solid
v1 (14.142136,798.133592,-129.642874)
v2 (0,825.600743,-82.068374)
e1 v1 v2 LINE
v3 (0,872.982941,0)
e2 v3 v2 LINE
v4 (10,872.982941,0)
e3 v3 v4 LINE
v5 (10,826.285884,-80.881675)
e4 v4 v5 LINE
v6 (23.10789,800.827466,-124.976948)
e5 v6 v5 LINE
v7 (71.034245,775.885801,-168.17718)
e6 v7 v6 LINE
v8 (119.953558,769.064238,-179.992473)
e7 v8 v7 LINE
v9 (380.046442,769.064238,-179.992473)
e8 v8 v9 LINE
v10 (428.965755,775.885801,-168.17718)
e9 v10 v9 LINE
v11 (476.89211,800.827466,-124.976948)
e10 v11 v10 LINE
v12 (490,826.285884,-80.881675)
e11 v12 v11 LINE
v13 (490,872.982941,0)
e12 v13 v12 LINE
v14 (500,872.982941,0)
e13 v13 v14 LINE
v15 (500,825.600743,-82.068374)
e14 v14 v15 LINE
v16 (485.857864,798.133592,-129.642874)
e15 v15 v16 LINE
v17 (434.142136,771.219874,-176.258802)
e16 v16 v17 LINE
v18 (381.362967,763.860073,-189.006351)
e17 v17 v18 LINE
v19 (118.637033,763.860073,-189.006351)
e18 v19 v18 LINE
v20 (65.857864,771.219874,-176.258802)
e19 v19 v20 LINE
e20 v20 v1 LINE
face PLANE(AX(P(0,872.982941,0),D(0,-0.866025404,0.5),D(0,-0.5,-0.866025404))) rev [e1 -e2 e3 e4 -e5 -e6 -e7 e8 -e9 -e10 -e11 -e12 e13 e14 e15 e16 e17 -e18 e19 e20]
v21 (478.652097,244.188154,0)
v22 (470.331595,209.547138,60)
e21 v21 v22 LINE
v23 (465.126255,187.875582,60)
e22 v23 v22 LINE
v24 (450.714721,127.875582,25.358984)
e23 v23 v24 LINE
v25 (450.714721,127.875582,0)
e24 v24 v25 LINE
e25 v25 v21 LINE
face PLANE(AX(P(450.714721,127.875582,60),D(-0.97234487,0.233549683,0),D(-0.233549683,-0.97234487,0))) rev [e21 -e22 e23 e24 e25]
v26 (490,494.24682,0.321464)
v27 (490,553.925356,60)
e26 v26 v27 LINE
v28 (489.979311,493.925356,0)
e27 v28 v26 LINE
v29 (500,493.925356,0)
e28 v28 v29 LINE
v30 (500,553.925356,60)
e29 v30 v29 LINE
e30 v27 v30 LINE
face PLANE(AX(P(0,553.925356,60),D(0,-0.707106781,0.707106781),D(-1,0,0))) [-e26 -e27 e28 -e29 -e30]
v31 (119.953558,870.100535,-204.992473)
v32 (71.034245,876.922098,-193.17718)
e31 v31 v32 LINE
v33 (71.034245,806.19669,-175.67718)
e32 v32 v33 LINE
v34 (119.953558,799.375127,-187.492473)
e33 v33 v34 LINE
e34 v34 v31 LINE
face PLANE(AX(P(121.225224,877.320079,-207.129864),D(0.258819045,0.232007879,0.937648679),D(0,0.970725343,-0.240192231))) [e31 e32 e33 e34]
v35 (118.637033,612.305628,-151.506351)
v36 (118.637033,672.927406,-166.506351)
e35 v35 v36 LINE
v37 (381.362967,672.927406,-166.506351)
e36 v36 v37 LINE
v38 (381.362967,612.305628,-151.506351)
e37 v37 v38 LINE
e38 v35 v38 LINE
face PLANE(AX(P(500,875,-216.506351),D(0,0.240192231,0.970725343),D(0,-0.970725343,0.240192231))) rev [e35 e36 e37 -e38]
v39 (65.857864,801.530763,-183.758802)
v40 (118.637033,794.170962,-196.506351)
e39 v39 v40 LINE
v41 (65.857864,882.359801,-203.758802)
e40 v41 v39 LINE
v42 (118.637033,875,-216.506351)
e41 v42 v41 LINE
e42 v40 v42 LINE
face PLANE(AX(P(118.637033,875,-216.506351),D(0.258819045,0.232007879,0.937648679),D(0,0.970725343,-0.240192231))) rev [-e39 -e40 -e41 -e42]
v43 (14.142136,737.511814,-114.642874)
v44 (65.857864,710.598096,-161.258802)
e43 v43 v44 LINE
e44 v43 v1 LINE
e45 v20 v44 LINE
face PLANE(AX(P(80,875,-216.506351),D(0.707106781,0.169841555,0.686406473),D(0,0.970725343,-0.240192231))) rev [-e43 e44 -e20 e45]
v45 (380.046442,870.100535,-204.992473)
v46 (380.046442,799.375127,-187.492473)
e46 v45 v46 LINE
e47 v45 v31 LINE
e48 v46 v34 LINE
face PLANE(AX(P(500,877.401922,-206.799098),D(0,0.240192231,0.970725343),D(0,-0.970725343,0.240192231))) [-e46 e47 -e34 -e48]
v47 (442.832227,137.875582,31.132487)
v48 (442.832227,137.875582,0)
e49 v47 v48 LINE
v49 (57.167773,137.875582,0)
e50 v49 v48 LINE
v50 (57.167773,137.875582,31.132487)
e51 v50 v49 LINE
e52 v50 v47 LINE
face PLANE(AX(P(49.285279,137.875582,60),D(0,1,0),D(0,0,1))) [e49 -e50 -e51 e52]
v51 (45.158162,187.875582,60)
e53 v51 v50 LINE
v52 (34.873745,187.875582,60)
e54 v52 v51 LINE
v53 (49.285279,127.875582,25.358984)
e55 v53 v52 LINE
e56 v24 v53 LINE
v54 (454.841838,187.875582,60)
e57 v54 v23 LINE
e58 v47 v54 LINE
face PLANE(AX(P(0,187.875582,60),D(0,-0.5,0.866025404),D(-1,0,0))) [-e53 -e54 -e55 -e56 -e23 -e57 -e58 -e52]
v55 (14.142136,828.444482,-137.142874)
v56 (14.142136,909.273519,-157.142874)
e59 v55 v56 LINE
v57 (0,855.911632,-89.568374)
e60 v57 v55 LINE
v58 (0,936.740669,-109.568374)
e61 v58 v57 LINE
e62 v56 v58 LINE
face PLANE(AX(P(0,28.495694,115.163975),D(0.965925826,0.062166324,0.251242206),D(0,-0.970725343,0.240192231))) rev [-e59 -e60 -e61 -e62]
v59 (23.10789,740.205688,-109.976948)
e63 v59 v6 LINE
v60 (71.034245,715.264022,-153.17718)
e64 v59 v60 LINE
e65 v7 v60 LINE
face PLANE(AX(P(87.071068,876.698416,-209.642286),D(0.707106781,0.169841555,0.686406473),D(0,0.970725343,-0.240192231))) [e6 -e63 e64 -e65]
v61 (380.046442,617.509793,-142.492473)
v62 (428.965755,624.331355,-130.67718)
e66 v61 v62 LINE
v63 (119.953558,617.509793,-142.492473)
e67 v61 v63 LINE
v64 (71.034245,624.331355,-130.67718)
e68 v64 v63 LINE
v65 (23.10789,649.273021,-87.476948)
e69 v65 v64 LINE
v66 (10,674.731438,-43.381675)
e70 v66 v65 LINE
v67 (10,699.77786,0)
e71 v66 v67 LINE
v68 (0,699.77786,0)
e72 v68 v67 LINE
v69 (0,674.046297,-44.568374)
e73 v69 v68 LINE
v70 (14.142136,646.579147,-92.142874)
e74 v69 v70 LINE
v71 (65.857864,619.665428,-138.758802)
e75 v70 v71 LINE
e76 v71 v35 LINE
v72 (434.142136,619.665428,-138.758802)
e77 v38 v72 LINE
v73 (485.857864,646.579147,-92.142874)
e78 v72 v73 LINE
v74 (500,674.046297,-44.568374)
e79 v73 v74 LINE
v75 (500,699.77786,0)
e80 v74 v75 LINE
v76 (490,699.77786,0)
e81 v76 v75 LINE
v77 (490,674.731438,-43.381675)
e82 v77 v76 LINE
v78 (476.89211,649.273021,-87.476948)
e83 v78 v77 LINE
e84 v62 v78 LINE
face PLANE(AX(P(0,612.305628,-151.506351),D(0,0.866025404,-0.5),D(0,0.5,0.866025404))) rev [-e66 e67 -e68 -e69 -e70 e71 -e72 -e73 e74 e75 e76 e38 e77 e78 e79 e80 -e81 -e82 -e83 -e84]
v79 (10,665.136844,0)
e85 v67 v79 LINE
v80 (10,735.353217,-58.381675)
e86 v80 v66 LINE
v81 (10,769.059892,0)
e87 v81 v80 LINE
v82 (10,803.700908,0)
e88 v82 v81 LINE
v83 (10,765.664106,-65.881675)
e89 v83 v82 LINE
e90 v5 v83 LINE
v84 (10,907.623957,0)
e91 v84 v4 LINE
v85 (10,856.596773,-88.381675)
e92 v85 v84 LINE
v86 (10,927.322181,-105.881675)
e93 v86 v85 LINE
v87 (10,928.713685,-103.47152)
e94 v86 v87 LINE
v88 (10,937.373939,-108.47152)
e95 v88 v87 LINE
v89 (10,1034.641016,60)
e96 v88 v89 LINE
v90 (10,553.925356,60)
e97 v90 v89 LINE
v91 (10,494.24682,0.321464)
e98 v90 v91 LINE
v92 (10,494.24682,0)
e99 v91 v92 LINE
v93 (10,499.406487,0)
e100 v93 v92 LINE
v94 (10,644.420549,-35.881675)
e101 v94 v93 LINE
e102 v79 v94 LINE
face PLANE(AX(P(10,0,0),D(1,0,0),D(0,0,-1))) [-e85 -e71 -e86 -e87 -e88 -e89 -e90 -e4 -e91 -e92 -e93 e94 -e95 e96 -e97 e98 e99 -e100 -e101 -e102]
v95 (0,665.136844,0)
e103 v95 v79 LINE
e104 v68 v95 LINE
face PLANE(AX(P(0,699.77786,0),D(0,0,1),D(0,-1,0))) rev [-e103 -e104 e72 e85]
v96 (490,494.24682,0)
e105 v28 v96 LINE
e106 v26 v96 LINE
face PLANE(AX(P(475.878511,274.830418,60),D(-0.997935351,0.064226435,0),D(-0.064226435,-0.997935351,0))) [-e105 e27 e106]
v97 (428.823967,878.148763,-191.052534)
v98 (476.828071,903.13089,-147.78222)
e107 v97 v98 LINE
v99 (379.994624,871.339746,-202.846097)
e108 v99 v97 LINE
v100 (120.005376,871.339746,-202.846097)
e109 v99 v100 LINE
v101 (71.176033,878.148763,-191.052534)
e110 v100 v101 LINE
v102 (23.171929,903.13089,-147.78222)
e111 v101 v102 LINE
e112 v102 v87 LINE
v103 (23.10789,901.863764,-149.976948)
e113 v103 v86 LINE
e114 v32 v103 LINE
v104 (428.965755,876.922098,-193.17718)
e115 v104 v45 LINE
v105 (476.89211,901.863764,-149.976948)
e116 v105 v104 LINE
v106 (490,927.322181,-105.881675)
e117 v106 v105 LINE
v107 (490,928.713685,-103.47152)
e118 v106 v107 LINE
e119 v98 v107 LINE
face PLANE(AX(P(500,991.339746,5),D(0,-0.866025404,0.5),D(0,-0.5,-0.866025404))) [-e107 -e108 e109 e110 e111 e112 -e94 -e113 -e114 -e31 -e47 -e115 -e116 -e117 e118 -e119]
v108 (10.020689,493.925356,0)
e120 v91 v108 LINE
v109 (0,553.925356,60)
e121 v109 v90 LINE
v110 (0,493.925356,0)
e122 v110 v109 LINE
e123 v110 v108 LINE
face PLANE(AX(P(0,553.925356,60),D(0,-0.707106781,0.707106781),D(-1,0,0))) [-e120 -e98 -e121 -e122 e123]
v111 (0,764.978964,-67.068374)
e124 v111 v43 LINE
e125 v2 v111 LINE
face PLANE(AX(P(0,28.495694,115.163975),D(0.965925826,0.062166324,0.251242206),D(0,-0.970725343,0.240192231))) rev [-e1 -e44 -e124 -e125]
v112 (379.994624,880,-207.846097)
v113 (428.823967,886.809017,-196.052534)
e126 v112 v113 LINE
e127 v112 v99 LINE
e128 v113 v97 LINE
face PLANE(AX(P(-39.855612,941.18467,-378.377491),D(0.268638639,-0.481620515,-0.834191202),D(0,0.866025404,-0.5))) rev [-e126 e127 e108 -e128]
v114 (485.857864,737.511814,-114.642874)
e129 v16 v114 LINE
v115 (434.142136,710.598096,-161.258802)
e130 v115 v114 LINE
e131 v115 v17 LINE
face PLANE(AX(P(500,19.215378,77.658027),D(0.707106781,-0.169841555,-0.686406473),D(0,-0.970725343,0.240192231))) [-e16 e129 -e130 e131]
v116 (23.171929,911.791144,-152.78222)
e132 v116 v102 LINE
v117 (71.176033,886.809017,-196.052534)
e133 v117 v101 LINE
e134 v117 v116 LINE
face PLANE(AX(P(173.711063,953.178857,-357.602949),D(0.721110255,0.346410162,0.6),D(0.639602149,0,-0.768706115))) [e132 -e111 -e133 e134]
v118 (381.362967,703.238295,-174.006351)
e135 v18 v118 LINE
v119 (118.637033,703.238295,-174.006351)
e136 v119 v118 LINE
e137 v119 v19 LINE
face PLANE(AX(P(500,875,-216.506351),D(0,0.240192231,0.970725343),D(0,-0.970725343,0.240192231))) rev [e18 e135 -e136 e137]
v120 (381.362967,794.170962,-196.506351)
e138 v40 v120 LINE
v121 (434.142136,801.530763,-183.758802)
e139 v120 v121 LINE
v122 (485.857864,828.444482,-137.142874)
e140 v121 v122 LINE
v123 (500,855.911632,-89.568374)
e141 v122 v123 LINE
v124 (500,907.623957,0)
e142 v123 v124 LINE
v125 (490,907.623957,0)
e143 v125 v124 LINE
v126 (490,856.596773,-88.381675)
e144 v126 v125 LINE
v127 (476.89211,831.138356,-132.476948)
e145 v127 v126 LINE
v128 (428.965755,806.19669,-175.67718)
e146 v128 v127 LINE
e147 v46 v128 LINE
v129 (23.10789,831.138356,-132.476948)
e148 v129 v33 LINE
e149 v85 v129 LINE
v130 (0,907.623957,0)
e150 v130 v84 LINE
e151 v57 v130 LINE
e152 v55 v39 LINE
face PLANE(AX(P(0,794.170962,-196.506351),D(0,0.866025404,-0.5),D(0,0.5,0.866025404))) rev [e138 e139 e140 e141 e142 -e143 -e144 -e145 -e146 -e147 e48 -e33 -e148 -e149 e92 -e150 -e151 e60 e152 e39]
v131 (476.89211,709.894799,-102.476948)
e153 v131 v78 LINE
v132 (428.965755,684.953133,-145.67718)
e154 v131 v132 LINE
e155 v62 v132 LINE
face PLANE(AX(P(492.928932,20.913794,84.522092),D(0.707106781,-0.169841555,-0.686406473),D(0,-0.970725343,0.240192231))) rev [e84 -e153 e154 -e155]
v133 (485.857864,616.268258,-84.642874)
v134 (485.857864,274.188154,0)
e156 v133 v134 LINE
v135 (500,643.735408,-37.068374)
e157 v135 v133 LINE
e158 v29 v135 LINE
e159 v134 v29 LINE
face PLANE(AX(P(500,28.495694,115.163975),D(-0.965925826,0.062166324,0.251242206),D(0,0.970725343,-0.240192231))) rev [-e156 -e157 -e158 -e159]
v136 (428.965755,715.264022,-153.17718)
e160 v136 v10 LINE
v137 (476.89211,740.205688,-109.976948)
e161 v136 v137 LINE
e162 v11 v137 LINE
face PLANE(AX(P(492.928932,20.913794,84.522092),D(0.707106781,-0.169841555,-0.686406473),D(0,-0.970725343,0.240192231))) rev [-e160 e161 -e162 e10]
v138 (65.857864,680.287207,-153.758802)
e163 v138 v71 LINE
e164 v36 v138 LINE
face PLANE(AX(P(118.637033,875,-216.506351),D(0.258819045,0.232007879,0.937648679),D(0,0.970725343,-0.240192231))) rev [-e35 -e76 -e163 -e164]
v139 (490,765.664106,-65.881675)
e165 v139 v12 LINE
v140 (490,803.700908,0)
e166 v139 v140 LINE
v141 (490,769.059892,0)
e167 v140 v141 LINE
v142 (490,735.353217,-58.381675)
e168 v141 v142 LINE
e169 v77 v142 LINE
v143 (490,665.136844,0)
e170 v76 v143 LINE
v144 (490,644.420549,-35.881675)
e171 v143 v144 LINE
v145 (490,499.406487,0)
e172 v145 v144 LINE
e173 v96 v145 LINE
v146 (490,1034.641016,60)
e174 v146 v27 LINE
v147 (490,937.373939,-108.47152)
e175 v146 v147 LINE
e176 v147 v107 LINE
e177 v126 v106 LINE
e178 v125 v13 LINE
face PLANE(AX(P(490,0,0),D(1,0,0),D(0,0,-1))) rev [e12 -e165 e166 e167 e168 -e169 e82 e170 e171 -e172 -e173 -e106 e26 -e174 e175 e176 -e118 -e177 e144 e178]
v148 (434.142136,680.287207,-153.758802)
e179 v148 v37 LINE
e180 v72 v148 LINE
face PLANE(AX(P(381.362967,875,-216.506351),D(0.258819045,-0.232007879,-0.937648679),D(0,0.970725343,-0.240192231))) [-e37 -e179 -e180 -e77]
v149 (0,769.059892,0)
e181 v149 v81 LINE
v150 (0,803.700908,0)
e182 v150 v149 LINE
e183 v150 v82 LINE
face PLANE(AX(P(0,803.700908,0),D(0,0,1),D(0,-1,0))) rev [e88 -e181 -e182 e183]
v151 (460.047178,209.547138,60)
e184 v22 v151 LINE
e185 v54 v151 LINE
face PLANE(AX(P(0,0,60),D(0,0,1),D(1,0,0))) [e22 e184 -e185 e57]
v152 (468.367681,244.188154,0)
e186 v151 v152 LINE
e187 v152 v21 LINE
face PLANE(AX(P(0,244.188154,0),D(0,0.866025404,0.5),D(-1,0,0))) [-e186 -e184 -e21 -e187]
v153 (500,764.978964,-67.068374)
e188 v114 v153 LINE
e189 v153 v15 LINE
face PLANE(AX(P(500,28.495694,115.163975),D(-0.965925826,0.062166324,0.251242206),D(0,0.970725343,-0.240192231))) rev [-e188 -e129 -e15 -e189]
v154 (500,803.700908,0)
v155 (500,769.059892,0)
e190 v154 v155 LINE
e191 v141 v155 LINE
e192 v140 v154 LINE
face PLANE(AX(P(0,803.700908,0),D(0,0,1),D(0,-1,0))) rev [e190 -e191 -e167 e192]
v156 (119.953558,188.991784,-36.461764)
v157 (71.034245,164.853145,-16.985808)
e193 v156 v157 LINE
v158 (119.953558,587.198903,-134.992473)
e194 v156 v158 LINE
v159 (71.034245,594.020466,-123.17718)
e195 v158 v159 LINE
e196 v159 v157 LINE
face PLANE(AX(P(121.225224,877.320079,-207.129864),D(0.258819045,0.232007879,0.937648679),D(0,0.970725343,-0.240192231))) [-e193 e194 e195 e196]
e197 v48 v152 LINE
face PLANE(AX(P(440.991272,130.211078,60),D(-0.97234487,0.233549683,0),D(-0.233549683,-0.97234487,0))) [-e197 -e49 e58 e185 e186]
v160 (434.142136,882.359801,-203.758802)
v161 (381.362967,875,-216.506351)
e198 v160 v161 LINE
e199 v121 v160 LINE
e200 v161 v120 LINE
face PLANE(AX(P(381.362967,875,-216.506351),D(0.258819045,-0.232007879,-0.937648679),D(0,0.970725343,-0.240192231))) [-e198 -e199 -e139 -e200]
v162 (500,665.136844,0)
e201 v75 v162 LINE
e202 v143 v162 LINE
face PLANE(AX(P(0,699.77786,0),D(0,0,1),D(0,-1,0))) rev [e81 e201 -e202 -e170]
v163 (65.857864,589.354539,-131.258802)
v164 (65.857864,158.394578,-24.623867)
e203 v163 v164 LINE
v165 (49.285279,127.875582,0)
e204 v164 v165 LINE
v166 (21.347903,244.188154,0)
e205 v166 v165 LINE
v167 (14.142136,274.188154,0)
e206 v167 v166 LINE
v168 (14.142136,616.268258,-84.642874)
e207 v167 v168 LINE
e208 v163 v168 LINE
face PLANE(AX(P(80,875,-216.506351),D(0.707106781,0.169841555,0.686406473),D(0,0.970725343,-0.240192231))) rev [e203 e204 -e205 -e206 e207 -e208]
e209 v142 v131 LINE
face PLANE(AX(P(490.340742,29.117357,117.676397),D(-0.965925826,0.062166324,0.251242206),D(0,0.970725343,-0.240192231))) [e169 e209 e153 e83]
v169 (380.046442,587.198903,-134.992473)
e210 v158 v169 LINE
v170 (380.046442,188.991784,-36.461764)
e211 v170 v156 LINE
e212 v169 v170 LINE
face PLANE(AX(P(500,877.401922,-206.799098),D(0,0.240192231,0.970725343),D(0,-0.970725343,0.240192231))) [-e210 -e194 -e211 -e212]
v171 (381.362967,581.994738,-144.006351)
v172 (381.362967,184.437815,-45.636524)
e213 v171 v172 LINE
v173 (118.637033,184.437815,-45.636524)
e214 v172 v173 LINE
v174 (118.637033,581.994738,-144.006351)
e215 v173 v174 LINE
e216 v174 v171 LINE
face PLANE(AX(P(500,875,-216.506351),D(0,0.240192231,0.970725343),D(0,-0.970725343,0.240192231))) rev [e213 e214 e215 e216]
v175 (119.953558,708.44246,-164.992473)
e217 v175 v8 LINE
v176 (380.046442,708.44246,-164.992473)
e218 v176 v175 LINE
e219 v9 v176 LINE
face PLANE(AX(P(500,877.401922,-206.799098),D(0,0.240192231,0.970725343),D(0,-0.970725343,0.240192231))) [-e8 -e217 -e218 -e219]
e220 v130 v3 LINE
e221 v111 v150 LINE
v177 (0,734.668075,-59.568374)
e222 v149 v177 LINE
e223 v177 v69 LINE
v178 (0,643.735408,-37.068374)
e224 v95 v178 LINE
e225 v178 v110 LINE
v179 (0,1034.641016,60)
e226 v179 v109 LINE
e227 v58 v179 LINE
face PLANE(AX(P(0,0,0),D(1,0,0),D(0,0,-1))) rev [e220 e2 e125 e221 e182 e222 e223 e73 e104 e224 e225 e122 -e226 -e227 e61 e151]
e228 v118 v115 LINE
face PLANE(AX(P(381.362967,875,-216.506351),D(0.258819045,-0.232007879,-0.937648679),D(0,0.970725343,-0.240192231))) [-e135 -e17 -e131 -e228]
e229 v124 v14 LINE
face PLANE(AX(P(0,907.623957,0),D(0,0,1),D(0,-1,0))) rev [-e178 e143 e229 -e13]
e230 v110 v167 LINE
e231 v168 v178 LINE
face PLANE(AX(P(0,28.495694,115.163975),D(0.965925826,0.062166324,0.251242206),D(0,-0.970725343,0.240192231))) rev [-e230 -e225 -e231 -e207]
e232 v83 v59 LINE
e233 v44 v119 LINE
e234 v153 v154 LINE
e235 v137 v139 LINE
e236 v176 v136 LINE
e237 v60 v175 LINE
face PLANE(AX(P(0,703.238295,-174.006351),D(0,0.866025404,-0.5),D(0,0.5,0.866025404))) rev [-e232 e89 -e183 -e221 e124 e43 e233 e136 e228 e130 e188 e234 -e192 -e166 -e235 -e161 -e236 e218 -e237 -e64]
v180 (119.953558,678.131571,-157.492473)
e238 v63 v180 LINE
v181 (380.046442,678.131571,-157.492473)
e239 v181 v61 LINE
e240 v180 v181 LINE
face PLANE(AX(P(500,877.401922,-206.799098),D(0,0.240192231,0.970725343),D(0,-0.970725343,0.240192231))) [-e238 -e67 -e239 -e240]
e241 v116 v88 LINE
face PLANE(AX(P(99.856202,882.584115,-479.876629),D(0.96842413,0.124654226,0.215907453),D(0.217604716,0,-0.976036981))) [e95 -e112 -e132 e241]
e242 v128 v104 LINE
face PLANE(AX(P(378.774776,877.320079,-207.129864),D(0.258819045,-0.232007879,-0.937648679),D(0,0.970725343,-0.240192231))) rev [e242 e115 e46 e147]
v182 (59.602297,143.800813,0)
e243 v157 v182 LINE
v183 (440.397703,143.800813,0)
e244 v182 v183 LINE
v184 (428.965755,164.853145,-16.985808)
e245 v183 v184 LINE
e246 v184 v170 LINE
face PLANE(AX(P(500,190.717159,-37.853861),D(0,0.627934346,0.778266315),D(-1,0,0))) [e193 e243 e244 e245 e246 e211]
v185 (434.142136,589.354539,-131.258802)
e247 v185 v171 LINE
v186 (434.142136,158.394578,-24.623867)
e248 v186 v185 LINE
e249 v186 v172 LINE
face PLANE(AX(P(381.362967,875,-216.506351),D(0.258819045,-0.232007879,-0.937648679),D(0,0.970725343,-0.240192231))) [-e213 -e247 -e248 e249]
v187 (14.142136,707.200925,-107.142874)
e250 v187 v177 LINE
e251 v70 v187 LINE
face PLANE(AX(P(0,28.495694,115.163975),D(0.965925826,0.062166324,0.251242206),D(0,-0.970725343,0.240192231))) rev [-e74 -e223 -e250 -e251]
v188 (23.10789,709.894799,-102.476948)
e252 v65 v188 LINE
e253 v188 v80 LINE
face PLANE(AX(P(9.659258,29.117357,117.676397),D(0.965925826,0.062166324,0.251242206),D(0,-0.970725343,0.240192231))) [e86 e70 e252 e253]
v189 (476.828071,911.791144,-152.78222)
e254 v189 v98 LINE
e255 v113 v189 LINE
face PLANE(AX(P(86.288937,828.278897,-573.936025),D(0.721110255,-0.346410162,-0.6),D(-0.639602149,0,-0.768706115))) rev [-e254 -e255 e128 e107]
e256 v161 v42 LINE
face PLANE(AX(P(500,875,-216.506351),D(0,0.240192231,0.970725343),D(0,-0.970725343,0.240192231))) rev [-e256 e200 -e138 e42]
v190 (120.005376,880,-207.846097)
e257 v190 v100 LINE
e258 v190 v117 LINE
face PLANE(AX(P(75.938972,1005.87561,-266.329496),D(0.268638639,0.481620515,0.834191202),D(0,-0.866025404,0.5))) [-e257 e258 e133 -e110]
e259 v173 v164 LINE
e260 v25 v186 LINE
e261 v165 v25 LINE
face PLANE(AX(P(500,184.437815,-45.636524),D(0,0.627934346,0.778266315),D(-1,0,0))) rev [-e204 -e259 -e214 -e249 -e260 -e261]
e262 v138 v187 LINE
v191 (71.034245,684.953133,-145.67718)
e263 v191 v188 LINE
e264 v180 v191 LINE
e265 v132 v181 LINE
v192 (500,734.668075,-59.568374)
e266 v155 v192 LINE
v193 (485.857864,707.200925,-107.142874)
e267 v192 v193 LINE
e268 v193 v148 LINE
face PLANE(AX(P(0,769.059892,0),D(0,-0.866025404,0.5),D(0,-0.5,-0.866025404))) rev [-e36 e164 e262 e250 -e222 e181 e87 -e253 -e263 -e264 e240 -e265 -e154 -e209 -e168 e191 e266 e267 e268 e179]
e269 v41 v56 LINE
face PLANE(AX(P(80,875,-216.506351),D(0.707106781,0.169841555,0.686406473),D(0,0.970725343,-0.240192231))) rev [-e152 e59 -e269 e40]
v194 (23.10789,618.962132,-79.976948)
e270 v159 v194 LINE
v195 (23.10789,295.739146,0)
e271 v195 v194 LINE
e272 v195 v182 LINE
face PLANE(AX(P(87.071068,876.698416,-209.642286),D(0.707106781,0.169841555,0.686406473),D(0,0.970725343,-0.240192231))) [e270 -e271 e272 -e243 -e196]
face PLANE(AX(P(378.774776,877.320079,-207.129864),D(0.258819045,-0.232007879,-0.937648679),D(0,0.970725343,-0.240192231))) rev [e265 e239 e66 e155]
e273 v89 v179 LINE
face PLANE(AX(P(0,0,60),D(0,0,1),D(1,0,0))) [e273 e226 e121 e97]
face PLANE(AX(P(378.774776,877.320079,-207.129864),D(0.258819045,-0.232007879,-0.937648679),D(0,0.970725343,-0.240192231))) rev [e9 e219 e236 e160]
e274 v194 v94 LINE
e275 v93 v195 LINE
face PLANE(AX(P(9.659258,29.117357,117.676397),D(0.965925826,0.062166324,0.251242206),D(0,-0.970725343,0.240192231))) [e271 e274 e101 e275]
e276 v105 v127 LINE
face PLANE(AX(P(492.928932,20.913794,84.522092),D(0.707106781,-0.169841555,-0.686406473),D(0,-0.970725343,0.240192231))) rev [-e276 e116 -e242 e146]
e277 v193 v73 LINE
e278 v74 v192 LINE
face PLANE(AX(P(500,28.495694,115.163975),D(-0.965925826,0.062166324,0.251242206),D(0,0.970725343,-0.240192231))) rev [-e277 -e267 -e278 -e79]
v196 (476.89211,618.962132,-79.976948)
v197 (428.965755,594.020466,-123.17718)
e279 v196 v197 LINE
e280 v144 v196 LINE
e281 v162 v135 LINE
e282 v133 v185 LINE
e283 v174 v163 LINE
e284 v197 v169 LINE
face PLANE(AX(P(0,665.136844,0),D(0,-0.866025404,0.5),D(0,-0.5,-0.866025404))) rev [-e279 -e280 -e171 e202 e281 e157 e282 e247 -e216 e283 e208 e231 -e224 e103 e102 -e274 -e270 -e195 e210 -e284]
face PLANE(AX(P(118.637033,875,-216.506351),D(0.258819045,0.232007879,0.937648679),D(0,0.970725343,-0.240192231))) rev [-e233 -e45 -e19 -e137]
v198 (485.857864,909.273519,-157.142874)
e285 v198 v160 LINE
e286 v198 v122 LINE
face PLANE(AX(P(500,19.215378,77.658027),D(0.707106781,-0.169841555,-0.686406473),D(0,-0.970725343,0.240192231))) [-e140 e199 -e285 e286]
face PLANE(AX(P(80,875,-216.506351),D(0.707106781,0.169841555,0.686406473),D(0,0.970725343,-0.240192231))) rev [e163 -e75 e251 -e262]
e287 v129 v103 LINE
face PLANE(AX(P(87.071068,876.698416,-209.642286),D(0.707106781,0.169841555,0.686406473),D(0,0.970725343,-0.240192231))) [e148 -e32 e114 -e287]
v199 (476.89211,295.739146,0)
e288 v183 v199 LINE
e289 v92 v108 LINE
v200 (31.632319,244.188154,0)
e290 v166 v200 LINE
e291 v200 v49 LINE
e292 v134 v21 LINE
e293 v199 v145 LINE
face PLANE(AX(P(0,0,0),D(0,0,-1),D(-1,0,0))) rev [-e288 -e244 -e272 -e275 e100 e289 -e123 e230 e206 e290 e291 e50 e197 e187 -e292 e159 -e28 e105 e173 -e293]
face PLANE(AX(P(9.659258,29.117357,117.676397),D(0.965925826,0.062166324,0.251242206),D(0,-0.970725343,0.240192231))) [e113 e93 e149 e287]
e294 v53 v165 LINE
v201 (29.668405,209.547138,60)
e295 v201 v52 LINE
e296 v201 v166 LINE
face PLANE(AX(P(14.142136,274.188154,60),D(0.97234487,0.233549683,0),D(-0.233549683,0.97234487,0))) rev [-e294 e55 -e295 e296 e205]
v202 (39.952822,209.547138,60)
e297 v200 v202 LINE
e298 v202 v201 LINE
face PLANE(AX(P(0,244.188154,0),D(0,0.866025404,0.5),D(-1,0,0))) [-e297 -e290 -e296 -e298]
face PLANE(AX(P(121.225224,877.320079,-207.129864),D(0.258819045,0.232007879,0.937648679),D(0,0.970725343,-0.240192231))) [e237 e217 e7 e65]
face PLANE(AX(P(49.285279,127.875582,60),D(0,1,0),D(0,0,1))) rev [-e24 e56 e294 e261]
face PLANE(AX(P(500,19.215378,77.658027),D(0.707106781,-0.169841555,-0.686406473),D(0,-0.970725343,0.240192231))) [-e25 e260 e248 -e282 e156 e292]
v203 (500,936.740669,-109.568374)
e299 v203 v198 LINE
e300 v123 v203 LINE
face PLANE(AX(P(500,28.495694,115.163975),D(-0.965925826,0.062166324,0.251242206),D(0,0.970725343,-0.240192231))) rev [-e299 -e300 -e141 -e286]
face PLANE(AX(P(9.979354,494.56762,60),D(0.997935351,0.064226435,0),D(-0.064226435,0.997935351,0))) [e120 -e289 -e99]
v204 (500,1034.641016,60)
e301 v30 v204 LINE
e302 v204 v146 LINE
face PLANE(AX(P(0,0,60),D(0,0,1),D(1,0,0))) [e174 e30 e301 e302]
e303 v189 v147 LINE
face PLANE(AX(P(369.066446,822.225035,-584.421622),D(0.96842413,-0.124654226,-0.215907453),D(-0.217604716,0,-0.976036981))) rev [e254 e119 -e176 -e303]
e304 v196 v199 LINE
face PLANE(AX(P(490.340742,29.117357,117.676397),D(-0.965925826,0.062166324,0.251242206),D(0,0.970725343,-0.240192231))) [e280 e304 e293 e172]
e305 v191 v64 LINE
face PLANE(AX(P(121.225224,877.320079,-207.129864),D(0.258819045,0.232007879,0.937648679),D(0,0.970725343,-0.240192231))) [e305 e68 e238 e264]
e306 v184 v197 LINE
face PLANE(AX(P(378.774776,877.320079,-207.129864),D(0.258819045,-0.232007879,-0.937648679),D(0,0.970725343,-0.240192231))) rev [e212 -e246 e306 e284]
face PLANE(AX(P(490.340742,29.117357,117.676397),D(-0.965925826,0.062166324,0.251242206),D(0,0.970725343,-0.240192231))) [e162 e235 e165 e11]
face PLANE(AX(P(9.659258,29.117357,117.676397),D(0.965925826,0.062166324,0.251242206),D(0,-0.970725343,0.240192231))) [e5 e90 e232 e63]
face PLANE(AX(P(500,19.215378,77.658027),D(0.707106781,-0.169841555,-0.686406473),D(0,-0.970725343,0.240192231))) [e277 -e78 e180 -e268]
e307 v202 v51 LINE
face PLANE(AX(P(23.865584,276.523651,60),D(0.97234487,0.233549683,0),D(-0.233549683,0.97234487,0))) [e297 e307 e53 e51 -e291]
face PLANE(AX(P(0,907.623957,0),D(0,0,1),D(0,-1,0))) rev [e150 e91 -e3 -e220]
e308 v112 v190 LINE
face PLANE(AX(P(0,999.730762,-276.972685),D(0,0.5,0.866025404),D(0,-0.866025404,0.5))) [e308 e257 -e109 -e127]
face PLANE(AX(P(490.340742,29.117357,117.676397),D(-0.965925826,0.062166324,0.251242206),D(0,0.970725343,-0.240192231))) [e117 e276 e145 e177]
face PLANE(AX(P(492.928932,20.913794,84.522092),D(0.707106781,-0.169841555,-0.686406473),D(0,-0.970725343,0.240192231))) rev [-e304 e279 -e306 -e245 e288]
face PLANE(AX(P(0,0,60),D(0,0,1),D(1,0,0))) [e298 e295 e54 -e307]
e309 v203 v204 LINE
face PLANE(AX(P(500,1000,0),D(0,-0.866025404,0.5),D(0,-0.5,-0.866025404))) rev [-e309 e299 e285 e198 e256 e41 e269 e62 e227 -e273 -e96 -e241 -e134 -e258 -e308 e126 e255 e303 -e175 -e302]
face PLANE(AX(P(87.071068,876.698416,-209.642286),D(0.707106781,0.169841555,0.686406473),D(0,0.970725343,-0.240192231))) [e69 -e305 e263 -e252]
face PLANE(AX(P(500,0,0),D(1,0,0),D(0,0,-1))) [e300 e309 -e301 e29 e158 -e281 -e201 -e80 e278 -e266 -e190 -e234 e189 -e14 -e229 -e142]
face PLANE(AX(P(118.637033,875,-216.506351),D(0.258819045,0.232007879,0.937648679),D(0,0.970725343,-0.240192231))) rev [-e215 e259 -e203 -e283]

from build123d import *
from OCP.BRepFilletAPI import BRepFilletAPI_MakeChamfer

# Parameters (mm, degrees)
BOSS_EXTRU_1_DEPTH                  = 500
CHANFREIN2_SIZE                     = 80
CHANFREIN3_SIZE                     = 19.999999999999996
CHANFREIN3_SIZE2                    = 38.63703305156302
CHANFREIN3_SIZE2_2                  = 38.63703305156301
CHANFREIN4_SIZE                     = 190.00000000000003
CHANFREIN4_SIZE2                    = 127.87558157978762
BOSS_EXTRU_2_DEPTH                  = 60
BOSS_EXTRU_3_DEPTH                  = 500
COQUE1_T                            = 10
ENL_V_MAT_EXTRU_2_REACH             = 940.137
ENL_V_MAT_EXTRU_2_DIRECTION_2_DEPTH = 939.1366191668232
ENL_V_START                         = -60
ENL_V_MAT_EXTRU_3_DEPTH             = 60
ENL_V_MAT_EXTRU_4_DEPTH             = 1170.3404261816813
CHANFREIN6_SIZE                     = 34.641016151
CHANFREIN6_SIZE_2                   = 60
CHANFREIN7_SIZE                     = 60
ENL_V_MAT_EXTRU_5_DEPTH             = 1170.3404261816813


# Some blends are built 0.0001 mm under size
with BuildPart() as part:
    # Esquisse3 → Boss.-Extru.1 (new body)
    with BuildSketch(Plane(origin=(0, 0, 0), x_dir=(0, 0, -1), z_dir=(1, 0, 0))):
        Polygon((0, 0), (0, 1000), (216.50635094611002, 875.0000000000006), align=None)
    extrude(amount=BOSS_EXTRU_1_DEPTH)

    # Chanfrein2
    chanfrein2_edges = [part.edges().sort_by_distance(p)[0] for p in [
        (500, 437.5000000000003, -108.25317547305501),
        (0, 437.5000000000003, -108.25317547305501),
    ]]
    chamfer(chanfrein2_edges, length=CHANFREIN2_SIZE)

    # Chanfrein3: one chamfer whose edges measure the first distance from different faces: ONE call of the kernel's chamfer builder (chamfer() names one face for all edges)
    chanfrein3_edges_1 = [part.edges().sort_by_distance(p)[0] for p in [
        (500, 624.8499399519503, -72.19766271841472),
        (420, 437.5000000000003, -108.25317547305504),
    ]]
    chanfrein3_side_1 = [part.faces().sort_by_distance(p)[0] for p in [
        (457.3358939482921, 524.9359686158087, -91.42611546732361),
    ]]
    chanfrein3_edges_2 = [part.edges().sort_by_distance(p)[0] for p in [
        (80, 437.50000000000017, -108.25317547305501),
        (0, 624.8499399519503, -72.1976627184147),
    ]]
    chanfrein3_side_2 = [part.faces().sort_by_distance(p)[0] for p in [
        (42.664106051707925, 524.9359686158089, -91.42611546732363),
    ]]
    chanfrein3 = BRepFilletAPI_MakeChamfer(part.part.solid().wrapped)
    for e in chanfrein3_edges_1:
        chanfrein3.Add(CHANFREIN3_SIZE, CHANFREIN3_SIZE2, e.wrapped, chanfrein3_side_1[0].wrapped)  # the first distance lies on this face
    for e in chanfrein3_edges_2:
        chanfrein3.Add(CHANFREIN3_SIZE, CHANFREIN3_SIZE2_2, e.wrapped, chanfrein3_side_2[0].wrapped)  # the first distance lies on this face
    add(Compound.cast(chanfrein3.Shape()), mode=Mode.REPLACE)

    # Chanfrein4
    chanfrein4_edges = [part.edges().sort_by_distance(p)[0] for p in [
        (249.99999999999994, 0, 0),
    ]]
    chanfrein4_side = [part.faces().sort_by_distance(p)[0] for p in [
        (249.99999999999997, 437.5000000000003, -108.25317547305502),
    ]]
    chamfer(chanfrein4_edges, length=CHANFREIN4_SIZE, length2=CHANFREIN4_SIZE2, reference=chanfrein4_side[0])

    # Esquisse4 → Boss.-Extru.2 (add)
    with BuildSketch(Plane.XY):
        Polygon((500, 1000), (0, 1000), (6.94e-15, 493.9253559619593), (14.142135623731011, 274.1881541390633), (49.28527880731526, 127.87558157978796), (450.7147211926849, 127.87558157978796), (485.85786437626905, 274.18815413906196), (500, 493.92535596195466), align=None)
    extrude(amount=BOSS_EXTRU_2_DEPTH)

    # Esquisse5 → Boss.-Extru.3 (add)
    with BuildSketch(Plane.ZY):
        Polygon((60, 1000), (60, 1034.6410161513777), (0, 1000), align=None)
    extrude(amount=-BOSS_EXTRU_3_DEPTH)

    # Coque1 (no face opened: a closed hollow body)
    add(offset(amount=-COQUE1_T, mode=Mode.PRIVATE), mode=Mode.SUBTRACT)

    # Esquisse6 → Enlèv. mat.-Extru.2 (cut, up to next)
    with BuildSketch(Plane(origin=(0, 750.0000000000025, -433.0127018922181), x_dir=(1, 0, 0), z_dir=(0, 0.86602540378444, -0.49999999999999784)), mode=Mode.PRIVATE) as enl_v_mat_extru_2_sk1:
        Polygon((10, -569.2820323027529), (10, -757.501187283232), (489.99999999999983, -757.5011872832318), (489.99999999999994, -569.2820323027527), (489.9999999999996, -374.7478772728107), (476.8280711810083, -323.58228852611177), (428.823967356419, -273.61803314286686), (379.9946243192759, -259.99999999999744), (120.00537568072383, -259.99999999999756), (71.17603264358065, -273.618033142867), (23.171928818991503, -323.58228852611194), (10.000000000000268, -374.74787727281085), align=None)
    enl_v_mat_extru_2_tool1 = extrude(enl_v_mat_extru_2_sk1.sketch, amount=-ENL_V_MAT_EXTRU_2_REACH, mode=Mode.PRIVATE) & part.part
    add(enl_v_mat_extru_2_tool1.solids().sort_by_distance((250, 1007.562635, 13.098868))[0], mode=Mode.SUBTRACT)

    # Esquisse6 → Enlèv. mat.-Extru.2 direction 2 (cut)
    with BuildSketch(Plane(origin=(0, 750.0000000000025, -433.0127018922181), x_dir=(1, 0, 0), z_dir=(0, 0.86602540378444, -0.49999999999999784))):
        Polygon((10, -569.2820323027529), (10, -757.501187283232), (489.99999999999983, -757.5011872832318), (489.99999999999994, -569.2820323027527), (489.9999999999996, -374.7478772728107), (476.8280711810083, -323.58228852611177), (428.823967356419, -273.61803314286686), (379.9946243192759, -259.99999999999744), (120.00537568072383, -259.99999999999756), (71.17603264358065, -273.618033142867), (23.171928818991503, -323.58228852611194), (10.000000000000268, -374.74787727281085), align=None)
    extrude(amount=ENL_V_MAT_EXTRU_2_DIRECTION_2_DEPTH, mode=Mode.SUBTRACT)

    # Esquisse7 → Enlèv. mat.-Extru.3 (cut)
    with BuildSketch(Plane.XY.offset(60).offset(ENL_V_START)):
        Polygon((475.93370620438793, 275.68803078848794), (442.8322266096682, 137.87558157978802), (57.16777339033198, 137.87558157978796), (24.066293795611983, 275.6880307884899), (10.000000000000009, 494.2468199914388), (10, 1034.6410161513777), (489.99999999999864, 1034.6410161513782), (489.9999999999996, 494.2468199914393), align=None)
    extrude(amount=ENL_V_MAT_EXTRU_3_DEPTH, mode=Mode.SUBTRACT)

    # Esquisse8 → Enlèv. mat.-Extru.4 (cut, through all)
    with BuildSketch(Plane(origin=(500, 0, 0), x_dir=(0, 0, -1), z_dir=(1, 0, 0))):
        Polygon((-60, 493.92535596195466), (0, 493.92535596195466), (-1.388e-14, 274.18815413906196), (-1.388e-14, 244.18815413906194), (-59.99999999999999, 244.18815413906194), (-60, 274.18815413906196), align=None)
    extrude(amount=-ENL_V_MAT_EXTRU_4_DEPTH, mode=Mode.SUBTRACT)

    # Chanfrein6
    # the kernel refuses this chamfer: 60, 34.641016151 mm, written as the material it takes off along each edge
    with BuildSketch(Plane(origin=(186.85746471381282, 244.1881541390619, 60), x_dir=(0, -0.9983227437537926, 0.05789386240267061), z_dir=(-1, 0, 0))) as chanfrein6_piece_1_section:
        Polygon((CHANFREIN6_SIZE * 0.998322743765, -CHANFREIN6_SIZE * 0.0578938624033), (-CHANFREIN6_SIZE_2 * 0.0578938624027, -CHANFREIN6_SIZE_2 * 0.998322743754), (0, 0), align=None)
    chanfrein6_piece_1 = extrude(amount=320.73470744761204, mode=Mode.PRIVATE)
    chanfrein6_piece_1 = split(chanfrein6_piece_1, bisect_by=Plane(origin=(26.49011099000677, 233.04123739645672, 1.648e-14), z_dir=(0, 6e-17, 1)), keep=Keep.TOP, mode=Mode.PRIVATE)
    add(chanfrein6_piece_1, mode=Mode.SUBTRACT)
    with BuildSketch(Plane(origin=(-105.93986647144428, 127.87558157978796, 60), x_dir=(0, -0.05789386240267084, -0.9983227437537926), z_dir=(1, 0, 0))) as chanfrein6_piece_2:
        Polygon((CHANFREIN6_SIZE * 0.998322743765, CHANFREIN6_SIZE * 0.0578938624033), (-CHANFREIN6_SIZE_2 * 0.0578938624027, CHANFREIN6_SIZE_2 * 0.998322743754), (0, 0), align=None)
    extrude(amount=711.8797329428887, mode=Mode.SUBTRACT)
    with BuildSketch(Plane(origin=(633.8772427337997, 244.1881541390619, 60), x_dir=(0, -0.9983227437537926, 0.05789386240267061), z_dir=(-1, 0, 0))) as chanfrein6_piece_3_section:
        Polygon((CHANFREIN6_SIZE * 0.998322743765, -CHANFREIN6_SIZE * 0.0578938624033), (-CHANFREIN6_SIZE_2 * 0.0578938624027, -CHANFREIN6_SIZE_2 * 0.998322743754), (0, 0), align=None)
    chanfrein6_piece_3 = extrude(amount=320.7347074476121, mode=Mode.PRIVATE)
    chanfrein6_piece_3 = split(chanfrein6_piece_3, bisect_by=Plane(origin=(473.5098890099937, 233.04123739645678, 1.648e-14), z_dir=(0, 6e-17, 1)), keep=Keep.TOP, mode=Mode.PRIVATE)
    add(chanfrein6_piece_3, mode=Mode.SUBTRACT)

    # Chanfrein7
    chanfrein7_edges = [part.edges().sort_by_distance(p)[0] for p in [
        (5.010344602246278, 493.92535596195466, 60),
        (494.98965539775355, 493.92535596195466, 60),
    ]]
    chamfer(chanfrein7_edges, length=CHANFREIN7_SIZE - 0.0001)  # a hair under: the kernel refuses the full size

    # Esquisse10 → Enlèv. mat.-Extru.5 (cut, through all)
    with BuildSketch(Plane(origin=(500, 0, 0), x_dir=(0, 0, -1), z_dir=(1, 0, 0))):
        Polygon((196.50635094610988, 794.1709623134528), (2.06e-15, 907.6239569296604), (4.01e-15, 872.9829407782828), (189.0063509461099, 763.8600731809975), align=None)
        Polygon((174.00635094610982, 703.2382949160867), (1.402e-14, 803.7009084755275), (1.911e-14, 769.0598923241499), (166.50635094610982, 672.9274057836313), align=None)
        Polygon((151.50635094610985, 612.3056275187206), (2.603e-14, 699.7778600213949), (3.259e-14, 665.1368438700174), (144.00635094610985, 581.9947383862652), align=None)
    extrude(amount=-ENL_V_MAT_EXTRU_5_DEPTH, mode=Mode.SUBTRACT)


solid = part.part
